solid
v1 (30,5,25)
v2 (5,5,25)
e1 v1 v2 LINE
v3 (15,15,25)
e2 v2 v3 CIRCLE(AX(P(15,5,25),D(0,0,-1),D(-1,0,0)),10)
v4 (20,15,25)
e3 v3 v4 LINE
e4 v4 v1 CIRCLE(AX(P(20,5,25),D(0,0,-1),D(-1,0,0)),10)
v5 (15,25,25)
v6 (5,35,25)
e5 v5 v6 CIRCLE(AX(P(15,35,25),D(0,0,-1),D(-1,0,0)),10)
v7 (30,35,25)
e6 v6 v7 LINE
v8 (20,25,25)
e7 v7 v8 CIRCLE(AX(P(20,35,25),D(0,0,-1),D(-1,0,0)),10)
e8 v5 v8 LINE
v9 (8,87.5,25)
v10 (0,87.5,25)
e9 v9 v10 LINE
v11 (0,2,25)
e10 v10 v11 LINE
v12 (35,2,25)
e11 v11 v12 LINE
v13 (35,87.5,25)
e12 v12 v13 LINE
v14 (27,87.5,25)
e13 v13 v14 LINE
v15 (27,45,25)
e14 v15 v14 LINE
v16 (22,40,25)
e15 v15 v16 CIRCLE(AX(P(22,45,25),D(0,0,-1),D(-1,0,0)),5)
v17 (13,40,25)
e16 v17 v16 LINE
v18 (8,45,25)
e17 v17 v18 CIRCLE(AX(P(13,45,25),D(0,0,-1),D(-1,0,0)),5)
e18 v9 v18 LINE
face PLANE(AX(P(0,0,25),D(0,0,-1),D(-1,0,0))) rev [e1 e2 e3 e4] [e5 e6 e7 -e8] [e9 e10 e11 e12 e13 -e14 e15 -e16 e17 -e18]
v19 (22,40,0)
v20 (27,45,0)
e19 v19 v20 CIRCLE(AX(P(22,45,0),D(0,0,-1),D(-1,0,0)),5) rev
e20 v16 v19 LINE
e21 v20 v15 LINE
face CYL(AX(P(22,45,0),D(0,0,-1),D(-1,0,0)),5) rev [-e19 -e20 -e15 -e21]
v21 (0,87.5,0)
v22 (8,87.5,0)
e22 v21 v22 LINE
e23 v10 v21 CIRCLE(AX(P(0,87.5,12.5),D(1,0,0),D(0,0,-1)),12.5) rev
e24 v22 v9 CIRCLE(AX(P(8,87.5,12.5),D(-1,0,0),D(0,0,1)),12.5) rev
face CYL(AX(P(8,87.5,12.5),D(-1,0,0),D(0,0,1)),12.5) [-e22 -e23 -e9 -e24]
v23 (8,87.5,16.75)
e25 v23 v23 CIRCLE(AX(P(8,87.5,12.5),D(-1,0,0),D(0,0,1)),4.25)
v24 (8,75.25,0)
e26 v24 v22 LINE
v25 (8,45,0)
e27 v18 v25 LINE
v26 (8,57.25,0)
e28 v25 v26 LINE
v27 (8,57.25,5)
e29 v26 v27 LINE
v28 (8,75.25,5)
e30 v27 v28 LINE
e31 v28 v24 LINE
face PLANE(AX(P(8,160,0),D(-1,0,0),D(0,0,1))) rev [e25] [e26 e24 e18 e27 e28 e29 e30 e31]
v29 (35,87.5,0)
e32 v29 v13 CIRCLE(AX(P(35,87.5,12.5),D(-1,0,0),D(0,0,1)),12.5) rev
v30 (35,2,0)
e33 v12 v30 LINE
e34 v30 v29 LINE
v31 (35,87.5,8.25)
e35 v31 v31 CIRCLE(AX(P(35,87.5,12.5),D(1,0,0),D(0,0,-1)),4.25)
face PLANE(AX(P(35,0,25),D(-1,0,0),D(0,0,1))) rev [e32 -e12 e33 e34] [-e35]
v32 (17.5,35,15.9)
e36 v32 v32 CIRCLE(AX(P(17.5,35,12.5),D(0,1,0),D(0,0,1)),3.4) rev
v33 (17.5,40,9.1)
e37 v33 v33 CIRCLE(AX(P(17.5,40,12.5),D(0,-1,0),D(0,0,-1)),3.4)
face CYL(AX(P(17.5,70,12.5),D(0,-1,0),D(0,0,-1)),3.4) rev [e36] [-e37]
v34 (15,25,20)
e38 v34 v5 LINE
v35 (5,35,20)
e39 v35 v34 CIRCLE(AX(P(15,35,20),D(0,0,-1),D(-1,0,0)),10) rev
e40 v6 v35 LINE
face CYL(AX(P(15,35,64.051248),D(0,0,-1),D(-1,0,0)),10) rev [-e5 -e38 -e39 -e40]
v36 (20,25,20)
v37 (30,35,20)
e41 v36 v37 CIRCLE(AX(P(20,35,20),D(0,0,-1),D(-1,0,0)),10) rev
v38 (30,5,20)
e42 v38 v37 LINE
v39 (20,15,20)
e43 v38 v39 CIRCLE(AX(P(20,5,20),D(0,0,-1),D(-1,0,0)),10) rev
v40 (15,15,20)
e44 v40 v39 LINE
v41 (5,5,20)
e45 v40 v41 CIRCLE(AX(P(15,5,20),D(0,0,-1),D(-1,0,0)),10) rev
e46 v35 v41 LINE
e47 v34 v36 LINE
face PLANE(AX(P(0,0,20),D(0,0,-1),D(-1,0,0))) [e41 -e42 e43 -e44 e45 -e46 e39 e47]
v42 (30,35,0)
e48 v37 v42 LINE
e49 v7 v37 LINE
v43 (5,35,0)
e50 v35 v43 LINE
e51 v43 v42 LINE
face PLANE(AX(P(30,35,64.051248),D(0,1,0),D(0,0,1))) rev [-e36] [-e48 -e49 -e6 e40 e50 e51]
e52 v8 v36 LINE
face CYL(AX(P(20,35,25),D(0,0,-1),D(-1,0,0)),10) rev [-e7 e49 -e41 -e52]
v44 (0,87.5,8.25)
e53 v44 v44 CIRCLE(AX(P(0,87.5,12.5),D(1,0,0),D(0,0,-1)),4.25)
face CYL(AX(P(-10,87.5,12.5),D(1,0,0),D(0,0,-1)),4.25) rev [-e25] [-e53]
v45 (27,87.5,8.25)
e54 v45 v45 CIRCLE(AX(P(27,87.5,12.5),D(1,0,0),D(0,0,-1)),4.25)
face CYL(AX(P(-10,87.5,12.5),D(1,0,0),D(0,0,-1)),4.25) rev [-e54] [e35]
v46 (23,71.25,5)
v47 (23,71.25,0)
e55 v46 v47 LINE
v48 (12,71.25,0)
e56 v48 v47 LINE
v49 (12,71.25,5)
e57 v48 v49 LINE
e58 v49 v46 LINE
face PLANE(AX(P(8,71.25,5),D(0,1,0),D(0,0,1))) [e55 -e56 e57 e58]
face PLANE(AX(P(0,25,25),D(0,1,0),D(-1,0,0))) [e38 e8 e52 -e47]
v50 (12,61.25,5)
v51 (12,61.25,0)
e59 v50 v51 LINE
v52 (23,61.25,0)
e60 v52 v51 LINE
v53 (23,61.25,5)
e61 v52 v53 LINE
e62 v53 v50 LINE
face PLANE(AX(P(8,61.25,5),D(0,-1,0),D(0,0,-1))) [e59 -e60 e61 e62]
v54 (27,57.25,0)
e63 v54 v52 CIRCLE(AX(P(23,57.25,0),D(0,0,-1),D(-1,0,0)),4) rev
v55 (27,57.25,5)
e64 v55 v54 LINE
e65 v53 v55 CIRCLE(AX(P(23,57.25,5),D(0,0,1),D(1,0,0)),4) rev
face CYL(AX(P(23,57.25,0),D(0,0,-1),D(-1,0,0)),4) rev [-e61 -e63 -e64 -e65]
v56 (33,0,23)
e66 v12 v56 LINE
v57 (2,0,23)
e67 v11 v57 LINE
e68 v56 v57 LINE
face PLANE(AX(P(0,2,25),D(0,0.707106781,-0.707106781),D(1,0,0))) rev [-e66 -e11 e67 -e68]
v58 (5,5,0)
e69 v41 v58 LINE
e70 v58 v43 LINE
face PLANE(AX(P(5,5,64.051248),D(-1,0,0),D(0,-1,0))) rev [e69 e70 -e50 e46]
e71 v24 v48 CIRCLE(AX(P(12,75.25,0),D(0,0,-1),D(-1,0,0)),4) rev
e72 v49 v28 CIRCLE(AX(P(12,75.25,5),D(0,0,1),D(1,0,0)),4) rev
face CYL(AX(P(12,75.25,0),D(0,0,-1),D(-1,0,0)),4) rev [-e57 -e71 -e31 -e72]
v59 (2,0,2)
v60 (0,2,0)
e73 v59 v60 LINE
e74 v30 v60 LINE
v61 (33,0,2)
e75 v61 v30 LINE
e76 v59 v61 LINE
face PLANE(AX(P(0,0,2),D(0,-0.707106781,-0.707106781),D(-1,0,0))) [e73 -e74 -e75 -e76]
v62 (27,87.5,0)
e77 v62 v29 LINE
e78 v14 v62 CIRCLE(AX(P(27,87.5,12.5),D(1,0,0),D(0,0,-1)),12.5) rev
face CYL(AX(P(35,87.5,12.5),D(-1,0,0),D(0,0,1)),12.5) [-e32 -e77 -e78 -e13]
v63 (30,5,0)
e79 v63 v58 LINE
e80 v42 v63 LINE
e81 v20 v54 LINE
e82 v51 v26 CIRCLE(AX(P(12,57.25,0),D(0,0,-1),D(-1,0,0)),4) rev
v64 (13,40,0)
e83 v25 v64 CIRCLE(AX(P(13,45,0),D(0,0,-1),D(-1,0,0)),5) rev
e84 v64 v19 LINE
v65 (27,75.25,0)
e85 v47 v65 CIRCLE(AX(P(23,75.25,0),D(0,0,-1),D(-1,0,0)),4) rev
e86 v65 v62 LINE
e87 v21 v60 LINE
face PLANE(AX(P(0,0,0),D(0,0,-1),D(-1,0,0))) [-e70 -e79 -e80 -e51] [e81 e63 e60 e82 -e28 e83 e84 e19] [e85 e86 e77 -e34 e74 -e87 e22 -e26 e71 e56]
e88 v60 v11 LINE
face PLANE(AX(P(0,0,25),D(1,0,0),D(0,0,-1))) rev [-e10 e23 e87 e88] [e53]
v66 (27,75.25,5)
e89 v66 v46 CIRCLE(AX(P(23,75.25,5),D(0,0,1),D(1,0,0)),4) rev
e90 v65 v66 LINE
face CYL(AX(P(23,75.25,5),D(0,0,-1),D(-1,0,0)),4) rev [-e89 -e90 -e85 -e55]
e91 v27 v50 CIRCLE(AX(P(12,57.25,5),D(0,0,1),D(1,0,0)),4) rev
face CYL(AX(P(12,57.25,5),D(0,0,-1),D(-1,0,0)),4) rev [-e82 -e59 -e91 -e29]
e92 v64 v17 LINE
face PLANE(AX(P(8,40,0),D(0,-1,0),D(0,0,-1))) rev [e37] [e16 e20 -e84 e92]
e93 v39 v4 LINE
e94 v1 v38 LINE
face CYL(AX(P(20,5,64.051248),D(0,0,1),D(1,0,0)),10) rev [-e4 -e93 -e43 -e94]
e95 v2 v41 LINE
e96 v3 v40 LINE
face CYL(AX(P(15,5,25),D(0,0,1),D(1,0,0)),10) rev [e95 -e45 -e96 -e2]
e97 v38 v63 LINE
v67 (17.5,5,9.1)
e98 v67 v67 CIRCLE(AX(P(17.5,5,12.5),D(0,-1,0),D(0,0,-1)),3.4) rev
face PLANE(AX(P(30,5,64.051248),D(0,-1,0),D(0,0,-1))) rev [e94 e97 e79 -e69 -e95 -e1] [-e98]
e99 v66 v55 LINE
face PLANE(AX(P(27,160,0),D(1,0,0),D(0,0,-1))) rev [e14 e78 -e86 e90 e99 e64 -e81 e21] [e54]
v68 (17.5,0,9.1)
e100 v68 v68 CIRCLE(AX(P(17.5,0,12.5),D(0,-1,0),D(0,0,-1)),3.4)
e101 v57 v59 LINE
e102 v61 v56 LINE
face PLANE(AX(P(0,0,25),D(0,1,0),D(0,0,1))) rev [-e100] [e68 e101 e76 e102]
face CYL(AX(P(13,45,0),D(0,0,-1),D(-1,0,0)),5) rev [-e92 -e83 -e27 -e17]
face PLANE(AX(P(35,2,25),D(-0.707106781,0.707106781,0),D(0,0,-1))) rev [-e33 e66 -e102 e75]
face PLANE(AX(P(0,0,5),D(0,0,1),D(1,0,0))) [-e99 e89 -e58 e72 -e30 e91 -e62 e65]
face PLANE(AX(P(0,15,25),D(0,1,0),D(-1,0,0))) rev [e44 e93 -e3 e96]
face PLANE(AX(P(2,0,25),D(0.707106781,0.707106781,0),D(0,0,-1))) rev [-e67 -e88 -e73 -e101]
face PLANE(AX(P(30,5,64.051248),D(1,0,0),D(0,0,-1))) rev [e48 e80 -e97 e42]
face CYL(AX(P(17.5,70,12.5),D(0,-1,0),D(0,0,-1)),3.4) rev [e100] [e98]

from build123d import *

# Parameters (mm, degrees)
SKETCH1_W           = 35
SKETCH1_H           = 100
BOSS_EXTRUDE1_DEPTH = 25
SKETCH2_W           = 19
SKETCH2_H           = 120
CUT_EXTRUDE1_DEPTH  = 25
FILLET2_RADIUS      = 12.5
FILLET2_LENGTH      = 8
FILLET3_RADIUS      = 12.5
FILLET3_LENGTH      = 8
SKETCH3_R           = 3.4
CUT_EXTRUDE2_DEPTH  = 70
SKETCH4_R           = 4.25
CUT_EXTRUDE3_DEPTH  = 45
SKETCH5_W           = 25
SKETCH5_H           = 30
CUT_EXTRUDE4_DEPTH  = 20
CHAMFER1_SIZE       = 2
FILLET4_R           = 5
SKETCH6_W           = 25
SKETCH6_H           = 10
CUT_EXTRUDE5_DEPTH  = 108.819293264
FILLET5_R           = 10
SKETCH7_W           = 19
SKETCH7_H           = 10
BOSS_EXTRUDE2_DEPTH = 5
FILLET6_R           = 4


with BuildPart() as part:
    # Sketch1 → Boss-Extrude1 (new body)
    with BuildSketch(Plane.XY):
        with Locations((17.5, 50)):
            Rectangle(SKETCH1_W, SKETCH1_H)
    extrude(amount=BOSS_EXTRUDE1_DEPTH)

    # Sketch2 → Cut-Extrude1 (cut)
    with BuildSketch(Plane.XY.offset(25)):
        with Locations((17.5, 100)):
            Rectangle(SKETCH2_W, SKETCH2_H)
    extrude(amount=-CUT_EXTRUDE1_DEPTH, mode=Mode.SUBTRACT)

    # Fillet2: full round fillet: the end face becomes a half cylinder, R = half its width
    fillet2_face = Plane((31, 100, 12.5), x_dir=(1, 0, 0), z_dir=(0, 1, 0))  # on the end face: x along it, z out of the body
    fillet2_slab = fillet2_face.offset(-FILLET2_RADIUS / 2) * Box(FILLET2_LENGTH, 2 * FILLET2_RADIUS, FILLET2_RADIUS, mode=Mode.PRIVATE)  # the body's end, R deep
    fillet2_round = Plane((31, 87.5, 12.5), x_dir=(0, 1, 0), z_dir=(1, 0, 0)) * Cylinder(FILLET2_RADIUS, FILLET2_LENGTH, mode=Mode.PRIVATE)  # its axis R under the face
    add(fillet2_slab - fillet2_round, mode=Mode.SUBTRACT)

    # Fillet3: full round fillet: the end face becomes a half cylinder, R = half its width
    fillet3_face = Plane((4, 100, 12.5), x_dir=(-1, 0, 0), z_dir=(0, 1, 0))  # on the end face: x along it, z out of the body
    fillet3_slab = fillet3_face.offset(-FILLET3_RADIUS / 2) * Box(FILLET3_LENGTH, 2 * FILLET3_RADIUS, FILLET3_RADIUS, mode=Mode.PRIVATE)  # the body's end, R deep
    fillet3_round = Plane((4, 87.5, 12.5), x_dir=(0, 1, 0), z_dir=(-1, 0, 0)) * Cylinder(FILLET3_RADIUS, FILLET3_LENGTH, mode=Mode.PRIVATE)  # its axis R under the face
    add(fillet3_slab - fillet3_round, mode=Mode.SUBTRACT)

    # Sketch3 → Cut-Extrude2 (cut)
    with BuildSketch(Plane.XZ):
        with Locations(Location((17.5, 12.5, 0), (0, 0, 270))):
            Circle(SKETCH3_R)
    extrude(amount=-CUT_EXTRUDE2_DEPTH, mode=Mode.SUBTRACT)

    # Sketch4 → Cut-Extrude3 (cut)
    with BuildSketch(Plane(origin=(35, 0, 0), x_dir=(0, 0, -1), z_dir=(1, 0, 0))):
        with Locations((-12.5, 87.5)):
            Circle(SKETCH4_R)
    extrude(amount=-CUT_EXTRUDE3_DEPTH, mode=Mode.SUBTRACT)

    # Sketch5 → Cut-Extrude4 (cut)
    with BuildSketch(Plane(origin=(0, 0, 0), x_dir=(-1, 0, 0), z_dir=(0, 0, -1))):
        with Locations((-17.5, 20)):
            Rectangle(SKETCH5_W, SKETCH5_H)
    extrude(amount=-CUT_EXTRUDE4_DEPTH, mode=Mode.SUBTRACT)

    # Chamfer1
    chamfer1_edges = [part.edges().sort_by_distance(p)[0] for p in [
        (17.5, 0, 0),
        (35, 0, 12.5),
        (0, 0, 12.5),
        (17.5, 0, 25),
    ]]
    chamfer(chamfer1_edges, length=CHAMFER1_SIZE)

    # Fillet4
    fillet4_edges = [part.edges().sort_by_distance(p)[0] for p in [
        (8, 40, 12.5),
        (27, 40, 12.5),
    ]]
    fillet(fillet4_edges, radius=FILLET4_R)

    # Sketch6 → Cut-Extrude5 (cut, through all)
    with BuildSketch(Plane(origin=(0, 0, 20), x_dir=(-1, 0, 0), z_dir=(0, 0, -1))):
        with Locations((-17.5, 30)):
            Rectangle(SKETCH6_W, SKETCH6_H)
        with Locations((-17.5, 10)):
            Rectangle(SKETCH6_W, SKETCH6_H)
    extrude(amount=-CUT_EXTRUDE5_DEPTH, mode=Mode.SUBTRACT)

    # Fillet5
    fillet5_edges = [part.edges().sort_by_distance(p)[0] for p in [
        (30, 15, 22.5),
        (30, 25, 22.5),
        (5, 25, 22.5),
        (5, 15, 22.5),
    ]]
    fillet(fillet5_edges, radius=FILLET5_R - 0.0001)  # a hair under: the kernel refuses the full size

    # Sketch7 → Boss-Extrude2 (add)
    with BuildSketch(Plane(origin=(0, 0, 0), x_dir=(-1, 0, 0), z_dir=(0, 0, -1))):
        with Locations((-17.5, 66.25)):
            Rectangle(SKETCH7_W, SKETCH7_H)
    extrude(amount=-BOSS_EXTRUDE2_DEPTH)

    # Fillet6
    fillet6_edges = [part.edges().sort_by_distance(p)[0] for p in [
        (8, 71.25, 2.5),
        (8, 61.25, 2.5),
        (27, 61.25, 2.5),
        (27, 71.25, 2.5),
    ]]
    fillet(fillet6_edges, radius=FILLET6_R)


solid = part.part
